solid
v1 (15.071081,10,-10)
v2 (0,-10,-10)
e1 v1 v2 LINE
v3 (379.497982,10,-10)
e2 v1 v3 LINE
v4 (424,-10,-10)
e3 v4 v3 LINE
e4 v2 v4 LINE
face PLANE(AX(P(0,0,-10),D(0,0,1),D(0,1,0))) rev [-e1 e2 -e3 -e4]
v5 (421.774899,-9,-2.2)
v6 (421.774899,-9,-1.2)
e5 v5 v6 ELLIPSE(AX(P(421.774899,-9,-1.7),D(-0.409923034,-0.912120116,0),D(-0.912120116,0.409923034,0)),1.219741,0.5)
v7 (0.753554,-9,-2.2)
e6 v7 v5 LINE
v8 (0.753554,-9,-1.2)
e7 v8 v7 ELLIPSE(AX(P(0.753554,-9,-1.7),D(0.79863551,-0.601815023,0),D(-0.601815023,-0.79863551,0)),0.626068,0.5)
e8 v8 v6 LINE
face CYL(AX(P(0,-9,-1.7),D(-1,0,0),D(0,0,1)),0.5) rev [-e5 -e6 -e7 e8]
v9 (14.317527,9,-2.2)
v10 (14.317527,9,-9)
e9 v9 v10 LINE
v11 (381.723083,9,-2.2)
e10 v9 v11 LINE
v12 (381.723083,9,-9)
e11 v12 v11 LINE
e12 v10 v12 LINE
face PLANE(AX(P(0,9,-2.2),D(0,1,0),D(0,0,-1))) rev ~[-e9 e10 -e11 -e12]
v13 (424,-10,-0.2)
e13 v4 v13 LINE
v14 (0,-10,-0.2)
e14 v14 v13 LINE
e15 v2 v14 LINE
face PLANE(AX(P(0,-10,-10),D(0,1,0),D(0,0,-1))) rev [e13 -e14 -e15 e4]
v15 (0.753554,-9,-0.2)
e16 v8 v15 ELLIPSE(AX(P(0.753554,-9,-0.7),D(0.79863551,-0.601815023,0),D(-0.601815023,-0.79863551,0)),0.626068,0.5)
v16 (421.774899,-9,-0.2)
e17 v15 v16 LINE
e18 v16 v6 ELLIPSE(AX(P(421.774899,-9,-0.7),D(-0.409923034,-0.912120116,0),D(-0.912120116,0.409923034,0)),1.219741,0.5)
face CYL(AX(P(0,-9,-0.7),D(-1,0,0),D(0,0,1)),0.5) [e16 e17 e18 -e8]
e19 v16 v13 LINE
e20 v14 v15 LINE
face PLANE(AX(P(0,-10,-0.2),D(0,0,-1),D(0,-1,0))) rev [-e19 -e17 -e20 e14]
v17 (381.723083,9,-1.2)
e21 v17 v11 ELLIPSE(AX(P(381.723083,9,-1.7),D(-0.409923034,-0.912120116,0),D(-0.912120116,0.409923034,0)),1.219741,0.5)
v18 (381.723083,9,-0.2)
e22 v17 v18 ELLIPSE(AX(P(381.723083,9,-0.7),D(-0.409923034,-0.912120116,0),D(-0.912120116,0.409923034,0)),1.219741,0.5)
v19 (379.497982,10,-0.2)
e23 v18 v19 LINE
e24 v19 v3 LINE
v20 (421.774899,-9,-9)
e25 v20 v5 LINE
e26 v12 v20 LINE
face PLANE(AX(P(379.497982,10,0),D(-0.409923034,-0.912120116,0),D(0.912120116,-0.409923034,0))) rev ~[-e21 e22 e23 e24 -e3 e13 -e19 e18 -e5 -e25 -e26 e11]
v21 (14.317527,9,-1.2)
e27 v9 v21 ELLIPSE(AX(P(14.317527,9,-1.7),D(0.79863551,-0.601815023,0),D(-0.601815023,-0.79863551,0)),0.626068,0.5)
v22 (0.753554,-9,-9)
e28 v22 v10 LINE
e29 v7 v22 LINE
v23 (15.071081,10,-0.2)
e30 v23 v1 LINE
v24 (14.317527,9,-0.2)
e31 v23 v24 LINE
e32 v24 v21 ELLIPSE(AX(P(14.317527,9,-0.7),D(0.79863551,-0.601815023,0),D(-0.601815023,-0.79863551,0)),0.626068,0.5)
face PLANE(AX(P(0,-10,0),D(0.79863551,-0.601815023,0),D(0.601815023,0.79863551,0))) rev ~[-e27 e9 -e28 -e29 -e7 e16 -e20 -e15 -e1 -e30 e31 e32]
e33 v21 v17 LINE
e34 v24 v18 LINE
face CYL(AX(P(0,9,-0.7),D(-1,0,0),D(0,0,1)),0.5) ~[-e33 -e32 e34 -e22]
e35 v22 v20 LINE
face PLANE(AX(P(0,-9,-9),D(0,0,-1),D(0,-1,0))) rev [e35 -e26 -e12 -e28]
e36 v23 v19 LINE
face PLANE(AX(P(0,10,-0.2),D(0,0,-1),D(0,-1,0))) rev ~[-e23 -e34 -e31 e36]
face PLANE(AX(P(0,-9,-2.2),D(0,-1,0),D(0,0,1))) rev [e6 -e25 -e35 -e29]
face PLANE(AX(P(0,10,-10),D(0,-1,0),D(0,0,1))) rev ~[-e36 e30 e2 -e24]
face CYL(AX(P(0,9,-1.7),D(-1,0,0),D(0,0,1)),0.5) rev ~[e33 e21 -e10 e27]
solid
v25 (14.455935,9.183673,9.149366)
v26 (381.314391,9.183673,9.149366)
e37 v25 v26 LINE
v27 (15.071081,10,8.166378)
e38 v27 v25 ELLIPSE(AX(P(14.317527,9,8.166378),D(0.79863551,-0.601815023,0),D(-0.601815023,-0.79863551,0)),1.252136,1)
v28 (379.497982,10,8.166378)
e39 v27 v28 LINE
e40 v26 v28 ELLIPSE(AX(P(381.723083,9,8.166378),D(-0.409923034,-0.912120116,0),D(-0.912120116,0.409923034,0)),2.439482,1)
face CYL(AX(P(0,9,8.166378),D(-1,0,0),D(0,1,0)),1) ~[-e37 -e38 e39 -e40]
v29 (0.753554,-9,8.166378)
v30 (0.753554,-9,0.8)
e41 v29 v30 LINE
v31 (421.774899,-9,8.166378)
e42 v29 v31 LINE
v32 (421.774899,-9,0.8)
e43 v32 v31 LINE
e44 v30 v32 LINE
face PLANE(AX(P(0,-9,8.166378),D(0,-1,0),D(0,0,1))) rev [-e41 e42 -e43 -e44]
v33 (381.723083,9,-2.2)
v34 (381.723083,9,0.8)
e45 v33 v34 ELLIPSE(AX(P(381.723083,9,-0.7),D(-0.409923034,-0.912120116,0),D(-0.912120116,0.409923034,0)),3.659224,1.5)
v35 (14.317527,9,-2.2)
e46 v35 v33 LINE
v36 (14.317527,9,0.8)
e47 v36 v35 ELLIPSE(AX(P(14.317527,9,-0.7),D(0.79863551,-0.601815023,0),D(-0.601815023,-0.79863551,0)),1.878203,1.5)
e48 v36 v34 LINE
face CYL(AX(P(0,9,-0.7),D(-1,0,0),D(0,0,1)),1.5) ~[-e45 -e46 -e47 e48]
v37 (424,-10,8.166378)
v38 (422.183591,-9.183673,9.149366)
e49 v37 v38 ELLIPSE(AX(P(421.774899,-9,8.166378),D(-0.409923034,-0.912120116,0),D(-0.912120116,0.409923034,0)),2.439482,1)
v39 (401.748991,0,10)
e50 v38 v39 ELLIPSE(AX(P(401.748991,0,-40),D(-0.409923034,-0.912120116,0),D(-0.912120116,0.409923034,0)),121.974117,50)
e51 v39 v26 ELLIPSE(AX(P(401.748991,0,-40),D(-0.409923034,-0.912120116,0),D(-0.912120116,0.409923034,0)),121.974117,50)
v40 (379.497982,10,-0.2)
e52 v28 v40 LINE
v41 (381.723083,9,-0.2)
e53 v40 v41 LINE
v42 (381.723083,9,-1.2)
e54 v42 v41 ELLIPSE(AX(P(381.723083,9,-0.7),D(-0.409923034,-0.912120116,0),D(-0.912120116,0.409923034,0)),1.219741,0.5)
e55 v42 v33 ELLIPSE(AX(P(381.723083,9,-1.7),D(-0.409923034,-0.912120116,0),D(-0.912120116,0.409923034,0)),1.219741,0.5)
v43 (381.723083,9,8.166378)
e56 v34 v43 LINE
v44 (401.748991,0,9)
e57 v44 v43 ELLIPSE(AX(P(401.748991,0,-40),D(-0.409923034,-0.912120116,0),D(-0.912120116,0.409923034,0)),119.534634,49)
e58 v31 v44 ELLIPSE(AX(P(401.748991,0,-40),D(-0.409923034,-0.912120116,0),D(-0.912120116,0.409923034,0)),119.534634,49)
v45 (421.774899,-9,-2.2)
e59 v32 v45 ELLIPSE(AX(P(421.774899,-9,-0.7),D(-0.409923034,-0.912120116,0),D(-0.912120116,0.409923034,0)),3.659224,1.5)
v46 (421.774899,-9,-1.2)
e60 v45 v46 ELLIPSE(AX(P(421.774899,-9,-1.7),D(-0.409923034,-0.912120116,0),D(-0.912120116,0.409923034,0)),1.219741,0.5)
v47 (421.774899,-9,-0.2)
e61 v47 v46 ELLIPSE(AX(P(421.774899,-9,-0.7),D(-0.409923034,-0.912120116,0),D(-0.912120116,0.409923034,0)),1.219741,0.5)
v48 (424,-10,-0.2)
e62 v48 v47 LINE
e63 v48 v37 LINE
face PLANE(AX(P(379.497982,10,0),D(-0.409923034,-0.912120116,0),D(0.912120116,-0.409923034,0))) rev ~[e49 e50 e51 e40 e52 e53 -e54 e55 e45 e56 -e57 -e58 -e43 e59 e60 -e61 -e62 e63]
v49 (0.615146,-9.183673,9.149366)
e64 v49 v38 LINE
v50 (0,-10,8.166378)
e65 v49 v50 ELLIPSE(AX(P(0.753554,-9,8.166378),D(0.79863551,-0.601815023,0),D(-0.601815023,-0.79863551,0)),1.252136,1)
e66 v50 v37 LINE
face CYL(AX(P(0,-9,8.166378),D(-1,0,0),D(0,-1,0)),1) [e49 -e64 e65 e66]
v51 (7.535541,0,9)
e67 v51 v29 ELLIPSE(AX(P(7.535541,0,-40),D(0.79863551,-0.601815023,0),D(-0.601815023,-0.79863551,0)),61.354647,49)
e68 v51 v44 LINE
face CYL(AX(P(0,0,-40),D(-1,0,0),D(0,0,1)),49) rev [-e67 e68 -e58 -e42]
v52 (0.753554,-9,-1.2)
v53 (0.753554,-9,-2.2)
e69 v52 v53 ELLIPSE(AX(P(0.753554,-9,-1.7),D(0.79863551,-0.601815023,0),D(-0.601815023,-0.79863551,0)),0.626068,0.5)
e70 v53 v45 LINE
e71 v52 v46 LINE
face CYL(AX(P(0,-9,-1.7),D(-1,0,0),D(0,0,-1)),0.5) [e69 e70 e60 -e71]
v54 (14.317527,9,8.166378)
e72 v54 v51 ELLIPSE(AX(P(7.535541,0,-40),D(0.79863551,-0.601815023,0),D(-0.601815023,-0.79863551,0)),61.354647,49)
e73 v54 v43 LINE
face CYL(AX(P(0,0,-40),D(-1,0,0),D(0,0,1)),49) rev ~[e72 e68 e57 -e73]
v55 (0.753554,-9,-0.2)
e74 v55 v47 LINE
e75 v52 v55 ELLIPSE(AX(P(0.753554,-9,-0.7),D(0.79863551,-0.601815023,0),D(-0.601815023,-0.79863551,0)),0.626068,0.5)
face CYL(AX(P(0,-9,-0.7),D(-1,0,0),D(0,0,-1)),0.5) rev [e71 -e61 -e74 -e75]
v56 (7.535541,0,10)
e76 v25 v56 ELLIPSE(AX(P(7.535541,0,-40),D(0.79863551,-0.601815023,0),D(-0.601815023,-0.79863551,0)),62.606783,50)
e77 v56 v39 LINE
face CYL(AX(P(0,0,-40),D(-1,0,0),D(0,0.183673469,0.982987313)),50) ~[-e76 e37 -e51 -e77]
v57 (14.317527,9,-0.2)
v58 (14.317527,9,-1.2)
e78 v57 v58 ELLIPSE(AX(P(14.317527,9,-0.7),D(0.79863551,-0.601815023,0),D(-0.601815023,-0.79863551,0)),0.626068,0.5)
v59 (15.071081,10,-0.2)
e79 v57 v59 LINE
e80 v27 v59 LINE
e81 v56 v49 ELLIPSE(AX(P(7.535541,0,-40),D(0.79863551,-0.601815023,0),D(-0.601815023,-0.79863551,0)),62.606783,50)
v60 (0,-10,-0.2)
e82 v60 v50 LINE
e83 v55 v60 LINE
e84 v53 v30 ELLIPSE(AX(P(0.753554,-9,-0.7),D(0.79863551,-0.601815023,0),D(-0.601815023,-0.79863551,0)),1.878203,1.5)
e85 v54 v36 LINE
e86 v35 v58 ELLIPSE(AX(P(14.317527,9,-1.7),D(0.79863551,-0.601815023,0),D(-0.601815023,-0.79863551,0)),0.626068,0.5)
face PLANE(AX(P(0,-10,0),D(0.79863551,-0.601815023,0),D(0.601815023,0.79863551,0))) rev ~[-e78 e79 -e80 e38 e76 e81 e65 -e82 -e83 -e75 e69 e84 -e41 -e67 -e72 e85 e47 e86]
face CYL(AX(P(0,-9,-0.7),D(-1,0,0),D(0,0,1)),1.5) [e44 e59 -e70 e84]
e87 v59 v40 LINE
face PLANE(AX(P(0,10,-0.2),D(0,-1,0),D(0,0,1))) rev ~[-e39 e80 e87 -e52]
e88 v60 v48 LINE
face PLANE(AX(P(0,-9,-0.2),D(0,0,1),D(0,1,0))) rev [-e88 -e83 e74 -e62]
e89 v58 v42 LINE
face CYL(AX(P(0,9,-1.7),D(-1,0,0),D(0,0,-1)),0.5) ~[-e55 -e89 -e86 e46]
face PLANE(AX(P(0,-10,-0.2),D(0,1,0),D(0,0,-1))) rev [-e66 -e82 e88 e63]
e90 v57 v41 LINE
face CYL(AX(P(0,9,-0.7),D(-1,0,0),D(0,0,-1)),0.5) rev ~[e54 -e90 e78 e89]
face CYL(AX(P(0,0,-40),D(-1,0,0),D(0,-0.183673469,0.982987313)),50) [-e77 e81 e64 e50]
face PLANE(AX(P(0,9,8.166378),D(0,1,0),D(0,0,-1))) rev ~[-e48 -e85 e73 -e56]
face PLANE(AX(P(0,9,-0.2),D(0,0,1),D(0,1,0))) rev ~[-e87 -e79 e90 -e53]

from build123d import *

# Parameters (mm, degrees)
F2_DEPTH      = 1000
F4_DEPTH      = 1000
F8_DEPTH      = 10.001
F8_DEPTH_BACK = 10.001


with BuildPart() as f2:
    # F1 (on Right) → F2 (new body)
    with BuildSketch(Plane.YZ):
        with BuildLine():
            Line((0, -9), (0, -10))
            Line((0, -10), (10, -10))
            Line((10, -10), (10, -0.2))
            Line((10, -0.2), (9, -0.2))
            ThreePointArc((9, -0.2), (8.5, -0.7), (9, -1.2))
            ThreePointArc((9, -1.2), (9.5, -1.7), (9, -2.2))
            Line((9, -2.2), (9, -9))
            Line((9, -9), (0, -9))
        make_face()
    extrude(amount=F2_DEPTH)

    # F5: F2 across plane


with BuildPart() as f4:
    # F3 (on Right) → F4 (new body)
    with BuildSketch(Plane.YZ):
        with BuildLine():
            Line((9, -0.2), (10, -0.2))
            Line((10, -0.2), (10, 8.1663783152))
            ThreePointArc((10, 8.1663783152), (9.7693092582, 8.8052548802), (9.1836734694, 9.1493656277))
            ThreePointArc((9.1836734694, 9.1493656277), (4.6114920912, 9.7868872364), (0, 10))
            Line((0, 10), (0, 9))
            ThreePointArc((0, 9), (4.5192622493, 8.7911494917), (9, 8.1663783152))
            Line((9, 8.1663783152), (9, 0.8))
            ThreePointArc((9, 0.8), (7.5, -0.7), (9, -2.2))
            ThreePointArc((9, -2.2), (9.5, -1.7), (9, -1.2))
            ThreePointArc((9, -1.2), (8.5, -0.7), (9, -0.2))
        make_face()
    extrude(amount=F4_DEPTH)

    # F6: F4 across plane


with BuildPart() as f2_1:
    add(f2.part)
    add(f2.part.mirror(Plane.XZ))


with BuildPart() as f4_1:
    add(f4.part)
    add(f4.part.mirror(Plane.XZ))


with BuildPart() as f8_tool:
    # F7 (on Top) → F8 (new body, two sides)
    with BuildSketch(Plane.XY) as f8_sk:
        Polygon((0, 10), (0, 0), (0, -10), (15.0710810021, 10), align=None)
        Polygon((379.4979817736, 10), (424, -10), (1016.9613361359, -10), (1016.9613361359, 10), (709.9114181152, 10), (424, 10), align=None)
    extrude(amount=F8_DEPTH)
    extrude(f8_sk.sketch, amount=-F8_DEPTH_BACK)


with BuildPart() as f2_2:
    add(f2_1.part)

    # F8: cut by f8_tool
    add(f8_tool.part, mode=Mode.SUBTRACT)


with BuildPart() as f4_2:
    add(f4_1.part)

    # F8: cut by f8_tool
    add(f8_tool.part, mode=Mode.SUBTRACT)


solid = Compound([f2_2.part, f4_2.part])
